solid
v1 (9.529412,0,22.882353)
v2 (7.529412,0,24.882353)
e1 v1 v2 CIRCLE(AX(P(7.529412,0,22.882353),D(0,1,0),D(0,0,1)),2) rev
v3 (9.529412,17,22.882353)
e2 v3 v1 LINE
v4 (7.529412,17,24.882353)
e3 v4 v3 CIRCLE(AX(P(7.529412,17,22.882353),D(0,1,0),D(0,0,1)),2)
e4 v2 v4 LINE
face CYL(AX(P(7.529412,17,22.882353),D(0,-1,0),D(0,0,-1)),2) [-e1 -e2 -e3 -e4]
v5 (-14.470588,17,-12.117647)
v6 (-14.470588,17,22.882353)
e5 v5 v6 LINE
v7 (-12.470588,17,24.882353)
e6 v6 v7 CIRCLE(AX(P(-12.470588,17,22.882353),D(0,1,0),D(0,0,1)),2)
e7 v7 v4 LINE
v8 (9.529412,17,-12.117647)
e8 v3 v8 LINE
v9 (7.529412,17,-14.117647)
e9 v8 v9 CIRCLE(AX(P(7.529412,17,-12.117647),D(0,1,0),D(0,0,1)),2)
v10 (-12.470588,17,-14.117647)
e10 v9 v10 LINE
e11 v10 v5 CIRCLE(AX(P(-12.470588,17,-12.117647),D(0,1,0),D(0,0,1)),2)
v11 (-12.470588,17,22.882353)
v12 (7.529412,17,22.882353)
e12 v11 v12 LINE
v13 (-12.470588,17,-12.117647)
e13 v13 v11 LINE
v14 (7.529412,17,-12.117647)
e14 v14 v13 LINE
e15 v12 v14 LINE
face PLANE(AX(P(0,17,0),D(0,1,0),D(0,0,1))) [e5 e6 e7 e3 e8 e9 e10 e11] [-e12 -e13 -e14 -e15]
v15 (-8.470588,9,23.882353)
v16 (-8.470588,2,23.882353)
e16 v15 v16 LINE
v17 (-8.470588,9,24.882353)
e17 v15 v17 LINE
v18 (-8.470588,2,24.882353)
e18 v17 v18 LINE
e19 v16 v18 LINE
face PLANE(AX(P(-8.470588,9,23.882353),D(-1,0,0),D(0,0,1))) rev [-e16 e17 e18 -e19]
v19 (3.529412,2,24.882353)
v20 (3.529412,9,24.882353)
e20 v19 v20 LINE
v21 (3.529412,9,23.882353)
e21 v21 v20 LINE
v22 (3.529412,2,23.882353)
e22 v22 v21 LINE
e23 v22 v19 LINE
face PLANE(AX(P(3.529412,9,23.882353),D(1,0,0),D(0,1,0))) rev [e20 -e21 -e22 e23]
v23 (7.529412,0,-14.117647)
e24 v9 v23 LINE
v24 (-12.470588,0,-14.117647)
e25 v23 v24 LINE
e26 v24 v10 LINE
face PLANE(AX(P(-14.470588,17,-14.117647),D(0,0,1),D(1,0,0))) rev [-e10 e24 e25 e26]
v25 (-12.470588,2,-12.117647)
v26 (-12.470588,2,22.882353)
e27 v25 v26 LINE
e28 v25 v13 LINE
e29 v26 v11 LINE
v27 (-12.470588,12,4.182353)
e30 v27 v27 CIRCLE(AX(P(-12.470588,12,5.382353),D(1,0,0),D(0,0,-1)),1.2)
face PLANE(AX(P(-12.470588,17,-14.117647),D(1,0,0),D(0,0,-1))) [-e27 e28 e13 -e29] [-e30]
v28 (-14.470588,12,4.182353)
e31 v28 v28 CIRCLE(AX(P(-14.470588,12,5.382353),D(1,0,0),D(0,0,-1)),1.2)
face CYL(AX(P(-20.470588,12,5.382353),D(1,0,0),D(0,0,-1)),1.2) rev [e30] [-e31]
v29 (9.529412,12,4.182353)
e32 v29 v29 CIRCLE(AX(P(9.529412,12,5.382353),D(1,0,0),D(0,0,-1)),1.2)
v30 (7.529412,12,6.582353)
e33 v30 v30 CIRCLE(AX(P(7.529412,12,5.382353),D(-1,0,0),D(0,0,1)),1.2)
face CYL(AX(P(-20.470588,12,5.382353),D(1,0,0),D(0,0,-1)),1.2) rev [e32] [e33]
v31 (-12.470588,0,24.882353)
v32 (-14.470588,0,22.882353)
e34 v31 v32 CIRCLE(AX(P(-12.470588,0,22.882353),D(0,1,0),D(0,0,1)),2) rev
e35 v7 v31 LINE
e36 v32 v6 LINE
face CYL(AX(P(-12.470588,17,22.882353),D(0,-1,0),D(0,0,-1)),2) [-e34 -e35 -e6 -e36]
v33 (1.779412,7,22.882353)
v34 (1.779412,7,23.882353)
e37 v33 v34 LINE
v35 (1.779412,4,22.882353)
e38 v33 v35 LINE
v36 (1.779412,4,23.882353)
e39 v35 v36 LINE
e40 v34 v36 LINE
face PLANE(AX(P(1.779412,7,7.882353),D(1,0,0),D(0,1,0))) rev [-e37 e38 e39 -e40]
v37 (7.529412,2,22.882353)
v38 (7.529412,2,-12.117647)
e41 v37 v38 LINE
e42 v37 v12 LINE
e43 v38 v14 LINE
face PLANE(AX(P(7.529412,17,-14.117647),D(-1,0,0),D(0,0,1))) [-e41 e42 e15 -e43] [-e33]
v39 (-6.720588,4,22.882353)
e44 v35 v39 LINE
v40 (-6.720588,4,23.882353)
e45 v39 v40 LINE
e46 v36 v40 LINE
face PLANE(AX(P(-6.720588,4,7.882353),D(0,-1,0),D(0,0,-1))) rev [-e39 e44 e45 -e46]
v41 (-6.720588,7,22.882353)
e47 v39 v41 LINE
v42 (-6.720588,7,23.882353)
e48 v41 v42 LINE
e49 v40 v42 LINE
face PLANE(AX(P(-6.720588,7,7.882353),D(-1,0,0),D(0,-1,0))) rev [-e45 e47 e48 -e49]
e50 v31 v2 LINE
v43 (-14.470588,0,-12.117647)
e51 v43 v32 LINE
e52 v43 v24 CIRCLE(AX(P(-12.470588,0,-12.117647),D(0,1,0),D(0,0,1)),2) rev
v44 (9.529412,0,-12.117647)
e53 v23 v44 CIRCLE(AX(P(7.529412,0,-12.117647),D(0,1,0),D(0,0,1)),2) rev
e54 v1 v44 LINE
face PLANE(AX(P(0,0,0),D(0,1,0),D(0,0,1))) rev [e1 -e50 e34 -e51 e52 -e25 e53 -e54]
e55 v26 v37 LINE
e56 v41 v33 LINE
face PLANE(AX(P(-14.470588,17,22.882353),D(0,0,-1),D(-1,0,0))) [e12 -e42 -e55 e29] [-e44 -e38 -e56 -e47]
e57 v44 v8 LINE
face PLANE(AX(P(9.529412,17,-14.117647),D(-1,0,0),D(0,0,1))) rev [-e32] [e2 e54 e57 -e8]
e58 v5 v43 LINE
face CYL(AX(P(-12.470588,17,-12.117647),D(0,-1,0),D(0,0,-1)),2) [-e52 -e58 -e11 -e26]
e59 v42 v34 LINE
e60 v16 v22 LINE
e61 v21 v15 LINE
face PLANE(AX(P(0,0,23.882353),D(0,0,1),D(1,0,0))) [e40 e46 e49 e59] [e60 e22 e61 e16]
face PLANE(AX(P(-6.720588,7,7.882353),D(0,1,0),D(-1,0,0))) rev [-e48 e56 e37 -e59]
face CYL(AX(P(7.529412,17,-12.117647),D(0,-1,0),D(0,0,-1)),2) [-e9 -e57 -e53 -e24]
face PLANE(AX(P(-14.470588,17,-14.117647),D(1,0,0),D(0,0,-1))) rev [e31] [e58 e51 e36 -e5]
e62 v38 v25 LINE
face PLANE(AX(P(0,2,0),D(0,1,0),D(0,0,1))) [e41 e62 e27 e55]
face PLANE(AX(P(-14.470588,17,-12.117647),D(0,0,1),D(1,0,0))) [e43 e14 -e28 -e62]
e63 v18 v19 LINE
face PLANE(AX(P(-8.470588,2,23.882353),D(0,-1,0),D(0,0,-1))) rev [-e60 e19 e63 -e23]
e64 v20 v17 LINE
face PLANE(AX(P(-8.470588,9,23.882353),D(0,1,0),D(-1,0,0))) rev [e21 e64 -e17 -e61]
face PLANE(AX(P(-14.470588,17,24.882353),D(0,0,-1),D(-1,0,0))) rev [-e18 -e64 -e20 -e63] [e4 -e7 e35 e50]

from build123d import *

# Parameters (mm, degrees)
IZIM1_W                     = 24
IZIM1_H                     = 39
Y_KSEKLIK_EKSTR_ZYON1_DEPTH = 17
RADYUS1_R                   = 2
BO_ALTMA1_START             = -12.470588235
BO_ALTMA1_OUTLINE_W         = 15
BO_ALTMA1_OUTLINE_H         = 35
BO_ALTMA1_DEPTH             = 20
IZIM2_W                     = 8.5
IZIM2_H                     = 3
KES_EKSTR_ZYON1_DEPTH       = 17
IZIM3_W                     = 12
IZIM3_H                     = 7
KES_EKSTR_ZYON2_DEPTH       = 1
IZIM5_R                     = 1.2
KES_EKSTR_ZYON3_DEPTH       = 30


# Read off the part's stored shape, not the designer's step: İç Boşaltma1
with BuildPart() as part:
    # Çizim1 → Yükseklik-Ekstrüzyon1 (new body)
    with BuildSketch(Plane(origin=(0, 0, 0), x_dir=(1, 0, 0), z_dir=(0, 1, 0))):
        with Locations((-2.470588235, -5.382352941)):
            Rectangle(IZIM1_W, IZIM1_H)
    extrude(amount=Y_KSEKLIK_EKSTR_ZYON1_DEPTH)

    # Radyus1
    radyus1_edges = [part.edges().sort_by_distance(p)[0] for p in [
        (-14.470588235, 8.5, -14.117647059),
        (9.529411765, 8.5, -14.117647059),
        (9.529411765, 8.5, 24.882352941),
        (-14.470588235, 8.5, 24.882352941),
    ]]
    fillet(radyus1_edges, radius=RADYUS1_R)

    # İç Boşaltma1 outline → İç Boşaltma1 (cut)
    with BuildSketch(Plane.YZ.offset(BO_ALTMA1_START)):
        with Locations((9.5, 5.382352941)):
            Rectangle(BO_ALTMA1_OUTLINE_W, BO_ALTMA1_OUTLINE_H)
    extrude(amount=BO_ALTMA1_DEPTH, mode=Mode.SUBTRACT)

    # Çizim2 → Kes-Ekstrüzyon1 (cut)
    with BuildSketch(Plane.XY.offset(24.882352941)):
        with Locations((-2.470588235, 5.5)):
            Rectangle(IZIM2_W, IZIM2_H)
    extrude(amount=-KES_EKSTR_ZYON1_DEPTH, mode=Mode.SUBTRACT)

    # Çizim3 → Kes-Ekstrüzyon2 (cut)
    with BuildSketch(Plane.XY.offset(24.882352941)):
        with Locations((-2.470588235, 5.5)):
            Rectangle(IZIM3_W, IZIM3_H)
    extrude(amount=-KES_EKSTR_ZYON2_DEPTH, mode=Mode.SUBTRACT)

    # Çizim5 → Kes-Ekstrüzyon3 (cut)
    with BuildSketch(Plane(origin=(9.529411765, 0, 0), x_dir=(0, 0, -1), z_dir=(1, 0, 0))):
        with Locations((-5.382352941, 12)):
            Circle(IZIM5_R)
    extrude(amount=-KES_EKSTR_ZYON3_DEPTH, mode=Mode.SUBTRACT)


solid = part.part
